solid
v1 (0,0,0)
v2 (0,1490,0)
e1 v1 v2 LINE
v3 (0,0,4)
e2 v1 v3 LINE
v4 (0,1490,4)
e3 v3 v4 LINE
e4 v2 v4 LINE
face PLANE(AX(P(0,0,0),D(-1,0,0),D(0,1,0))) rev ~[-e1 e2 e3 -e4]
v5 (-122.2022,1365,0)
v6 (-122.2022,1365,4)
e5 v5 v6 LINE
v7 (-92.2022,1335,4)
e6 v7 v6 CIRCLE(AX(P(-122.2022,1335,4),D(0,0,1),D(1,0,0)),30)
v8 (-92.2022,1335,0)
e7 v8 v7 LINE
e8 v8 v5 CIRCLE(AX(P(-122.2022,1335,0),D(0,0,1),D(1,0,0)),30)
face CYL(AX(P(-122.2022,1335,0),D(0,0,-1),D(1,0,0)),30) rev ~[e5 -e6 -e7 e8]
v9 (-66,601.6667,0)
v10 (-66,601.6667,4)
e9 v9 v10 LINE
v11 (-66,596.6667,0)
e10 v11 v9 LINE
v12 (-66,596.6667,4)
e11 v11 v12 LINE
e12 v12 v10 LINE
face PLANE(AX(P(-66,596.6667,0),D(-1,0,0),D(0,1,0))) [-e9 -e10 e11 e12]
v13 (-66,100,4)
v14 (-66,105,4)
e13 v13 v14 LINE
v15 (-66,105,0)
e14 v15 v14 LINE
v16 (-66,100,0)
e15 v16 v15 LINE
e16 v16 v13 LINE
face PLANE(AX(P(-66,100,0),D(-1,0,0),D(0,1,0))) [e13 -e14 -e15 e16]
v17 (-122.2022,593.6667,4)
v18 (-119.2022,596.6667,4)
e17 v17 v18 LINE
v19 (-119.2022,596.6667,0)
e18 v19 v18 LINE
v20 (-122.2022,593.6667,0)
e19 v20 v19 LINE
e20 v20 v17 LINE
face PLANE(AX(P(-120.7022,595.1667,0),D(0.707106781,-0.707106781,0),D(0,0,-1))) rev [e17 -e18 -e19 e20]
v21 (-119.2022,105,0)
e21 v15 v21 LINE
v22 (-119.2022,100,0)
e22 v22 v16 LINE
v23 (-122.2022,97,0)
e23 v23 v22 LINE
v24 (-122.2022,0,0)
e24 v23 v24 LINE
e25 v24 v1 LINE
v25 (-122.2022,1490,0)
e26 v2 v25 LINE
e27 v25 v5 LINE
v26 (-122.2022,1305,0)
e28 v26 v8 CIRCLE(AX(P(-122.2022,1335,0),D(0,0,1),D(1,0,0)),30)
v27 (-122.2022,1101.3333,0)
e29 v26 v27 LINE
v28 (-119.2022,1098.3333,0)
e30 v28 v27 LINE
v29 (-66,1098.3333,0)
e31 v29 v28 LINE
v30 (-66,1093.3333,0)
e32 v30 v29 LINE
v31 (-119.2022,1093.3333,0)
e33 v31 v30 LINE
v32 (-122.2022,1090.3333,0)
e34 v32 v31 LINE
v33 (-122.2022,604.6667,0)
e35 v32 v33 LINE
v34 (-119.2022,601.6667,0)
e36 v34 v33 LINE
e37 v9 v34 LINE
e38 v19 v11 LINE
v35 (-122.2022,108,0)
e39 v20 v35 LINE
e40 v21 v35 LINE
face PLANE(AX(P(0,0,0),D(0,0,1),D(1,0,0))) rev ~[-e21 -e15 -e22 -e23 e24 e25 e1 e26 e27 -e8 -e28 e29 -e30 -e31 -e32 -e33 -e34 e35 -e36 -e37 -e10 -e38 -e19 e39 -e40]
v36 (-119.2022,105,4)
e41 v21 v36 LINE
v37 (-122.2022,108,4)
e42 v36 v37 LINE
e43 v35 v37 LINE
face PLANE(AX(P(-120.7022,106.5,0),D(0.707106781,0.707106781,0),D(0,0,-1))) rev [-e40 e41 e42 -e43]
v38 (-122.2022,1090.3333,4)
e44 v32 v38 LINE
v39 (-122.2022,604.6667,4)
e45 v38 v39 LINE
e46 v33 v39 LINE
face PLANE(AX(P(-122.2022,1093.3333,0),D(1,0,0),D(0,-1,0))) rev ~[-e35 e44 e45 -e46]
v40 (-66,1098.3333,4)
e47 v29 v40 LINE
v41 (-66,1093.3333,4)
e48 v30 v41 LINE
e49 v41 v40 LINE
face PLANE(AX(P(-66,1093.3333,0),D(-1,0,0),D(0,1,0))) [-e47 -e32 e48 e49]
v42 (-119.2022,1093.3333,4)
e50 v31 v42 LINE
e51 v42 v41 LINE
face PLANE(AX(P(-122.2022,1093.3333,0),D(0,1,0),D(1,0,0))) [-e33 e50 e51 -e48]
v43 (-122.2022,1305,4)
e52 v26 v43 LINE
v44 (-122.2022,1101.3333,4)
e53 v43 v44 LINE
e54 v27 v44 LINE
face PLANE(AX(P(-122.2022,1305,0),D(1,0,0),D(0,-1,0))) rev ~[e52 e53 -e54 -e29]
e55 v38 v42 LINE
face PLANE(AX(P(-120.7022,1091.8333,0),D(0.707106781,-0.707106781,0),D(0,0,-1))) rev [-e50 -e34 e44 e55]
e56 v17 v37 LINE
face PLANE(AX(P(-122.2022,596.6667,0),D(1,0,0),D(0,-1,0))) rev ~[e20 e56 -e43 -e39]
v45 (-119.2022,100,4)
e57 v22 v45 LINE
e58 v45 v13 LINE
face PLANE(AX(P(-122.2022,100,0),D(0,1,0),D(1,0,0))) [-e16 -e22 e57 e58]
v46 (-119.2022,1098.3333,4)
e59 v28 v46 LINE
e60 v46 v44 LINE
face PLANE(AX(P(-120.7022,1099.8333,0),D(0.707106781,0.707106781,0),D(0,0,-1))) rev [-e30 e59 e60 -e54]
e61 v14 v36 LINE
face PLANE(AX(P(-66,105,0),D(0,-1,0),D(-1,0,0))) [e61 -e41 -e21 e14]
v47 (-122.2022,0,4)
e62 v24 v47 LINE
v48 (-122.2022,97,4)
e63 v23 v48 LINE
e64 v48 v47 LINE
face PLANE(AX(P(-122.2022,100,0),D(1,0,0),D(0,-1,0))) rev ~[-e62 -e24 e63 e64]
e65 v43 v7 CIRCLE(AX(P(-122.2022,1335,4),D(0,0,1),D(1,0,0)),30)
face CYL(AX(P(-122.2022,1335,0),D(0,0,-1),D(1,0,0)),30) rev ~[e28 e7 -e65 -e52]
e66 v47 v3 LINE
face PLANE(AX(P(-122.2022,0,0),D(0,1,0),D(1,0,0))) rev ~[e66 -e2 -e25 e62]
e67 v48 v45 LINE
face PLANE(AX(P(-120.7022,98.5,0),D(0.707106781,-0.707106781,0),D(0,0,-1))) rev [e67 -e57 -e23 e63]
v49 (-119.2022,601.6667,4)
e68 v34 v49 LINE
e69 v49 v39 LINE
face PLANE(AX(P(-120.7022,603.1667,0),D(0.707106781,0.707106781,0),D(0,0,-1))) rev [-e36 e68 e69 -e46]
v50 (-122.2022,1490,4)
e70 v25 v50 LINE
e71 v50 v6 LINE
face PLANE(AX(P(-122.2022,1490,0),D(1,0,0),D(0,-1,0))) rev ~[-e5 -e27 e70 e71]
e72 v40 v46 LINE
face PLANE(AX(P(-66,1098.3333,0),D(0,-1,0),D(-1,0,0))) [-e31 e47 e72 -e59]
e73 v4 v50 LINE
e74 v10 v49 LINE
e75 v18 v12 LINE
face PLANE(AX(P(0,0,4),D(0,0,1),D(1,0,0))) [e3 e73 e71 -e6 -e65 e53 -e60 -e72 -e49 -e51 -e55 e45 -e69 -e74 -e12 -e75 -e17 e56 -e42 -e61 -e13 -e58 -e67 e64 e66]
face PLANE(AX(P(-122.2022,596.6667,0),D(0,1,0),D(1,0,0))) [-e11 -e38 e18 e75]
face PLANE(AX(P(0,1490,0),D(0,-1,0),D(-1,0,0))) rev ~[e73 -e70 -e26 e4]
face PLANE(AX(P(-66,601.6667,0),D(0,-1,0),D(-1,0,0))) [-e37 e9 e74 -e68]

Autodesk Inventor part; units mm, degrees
ref_plane "YZ Plane" through (0, 0, 0) normal (1, 0, 0) x (0, 1, 0)
ref_plane "XZ Plane" through (0, 0, 0) normal (0, 1, 0) x (-1, 0, 0)
ref_plane "XY Plane" through (0, 0, 0) normal (0, 0, 1) x (1, 0, 0)
sketch "Sketch1" plane through (0, 0, 0) normal (0, 0, 1) x (1, 0, 0)
  line L0 (0, 1490) -> (-122.2022, 1490)
  line L1 (-122.2022, 1490) -> (-122.2022, 0)
  line L2 (-122.2022, 0) -> (0, 0)
  line L3 (0, 0) -> (0, 1490)
  line L4 (-122.2022, 100) -> (-66, 100)
  line L5 (-66, 100) -> (-66, 105)
  line L6 (-66, 105) -> (-122.2022, 105)
  line L7 (-122.2022, 105) -> (-122.2022, 100)
  line L8 (-122.2022, 596.6667) -> (-66, 596.6667)
  line L9 (-66, 596.6667) -> (-66, 601.6667)
  line L10 (-66, 601.6667) -> (-122.2022, 601.6667)
  line L11 (-122.2022, 601.6667) -> (-122.2022, 596.6667)
  line L12 (-122.2022, 1093.3333) -> (-66, 1093.3333)
  line L13 (-66, 1093.3333) -> (-66, 1098.3333)
  line L14 (-66, 1098.3333) -> (-122.2022, 1098.3333)
  line L15 (-122.2022, 1098.3333) -> (-122.2022, 1093.3333)
  circle A0 centre (-122.2022, 1335) radius 30
  point P0 (-122.2022, 1098.3333)
  point P1 (-122.2022, 1093.3333)
  point P2 (-122.2022, 601.6667)
  point P3 (-122.2022, 596.6667)
  point P4 (-122.2022, 105)
  point P5 (-122.2022, 1365)
  point P6 (-122.2022, 1305)
  dimension "d0" = 1490
  dimension "d1" = 122.2022
  dimension "d2" = 5
  dimension "d4" = 100
  dimension "d7" = 496.6667
  dimension "d23" = 66
  dimension "d29" = 60
  dimension "d30" = 1335
extrude "Plate1" add sketch "Sketch1" along normal blind 4 contours L3 L2 L1 L4 L5 L6 L8 L9 L10 L12 L13 L14 A0 L0
chamfer "Corner Chamfer1" distance 3 angle 45 6 edges at (-122.2022, 100, 2) (-122.2022, 105, 2) (-122.2022, 596.6667, 2) (-122.2022, 601.6667, 2) (-122.2022, 1098.3333, 2) (-122.2022, 1093.3333, 2)
equation "\"d0\" = Стрингер_длина"
equation "\"d1\" = стрингер_глубина_7"
equation "\"d2\" = паз_под_стрингер_толщина"
equation "\"d7\" = Шаг_шпангоутов"
equation "\"d23\" = паз_под_стрингер_глубина - Thickness"
equation "\"d29\" = 2 * радиус_выреза_под_сварку"
equation "\"d12\" = Thickness"
equation "\"BendRadius\" = Thickness"
equation "\"BendReliefWidth\" = Thickness"
equation "\"BendReliefDepth\" = 0.5 * Thickness"
equation "\"CornerReliefSize\" = 4 * Thickness"
equation "\"MinimumRemnant\" = 2 * Thickness"
equation "\"TransitionRadius\" = BendRadius"
equation "\"JacobiRadiusSize\" = BendRadius"
equation "\"GapSize\" = Thickness"
equation "\"Стрингер_длина\" = 1490"
equation "\"стрингер_глубина_7\" = 122.202218"
equation "\"паз_под_стрингер_толщина\" = 5"
equation "\"Шаг_шпангоутов\" = 496.666667"
equation "\"паз_под_стрингер_глубина\" = 70"
equation "\"Thickness\" = 4"
equation "\"радиус_выреза_под_сварку\" = 30"
properties part number "01013 GBK stringer C7" material "Steel"
